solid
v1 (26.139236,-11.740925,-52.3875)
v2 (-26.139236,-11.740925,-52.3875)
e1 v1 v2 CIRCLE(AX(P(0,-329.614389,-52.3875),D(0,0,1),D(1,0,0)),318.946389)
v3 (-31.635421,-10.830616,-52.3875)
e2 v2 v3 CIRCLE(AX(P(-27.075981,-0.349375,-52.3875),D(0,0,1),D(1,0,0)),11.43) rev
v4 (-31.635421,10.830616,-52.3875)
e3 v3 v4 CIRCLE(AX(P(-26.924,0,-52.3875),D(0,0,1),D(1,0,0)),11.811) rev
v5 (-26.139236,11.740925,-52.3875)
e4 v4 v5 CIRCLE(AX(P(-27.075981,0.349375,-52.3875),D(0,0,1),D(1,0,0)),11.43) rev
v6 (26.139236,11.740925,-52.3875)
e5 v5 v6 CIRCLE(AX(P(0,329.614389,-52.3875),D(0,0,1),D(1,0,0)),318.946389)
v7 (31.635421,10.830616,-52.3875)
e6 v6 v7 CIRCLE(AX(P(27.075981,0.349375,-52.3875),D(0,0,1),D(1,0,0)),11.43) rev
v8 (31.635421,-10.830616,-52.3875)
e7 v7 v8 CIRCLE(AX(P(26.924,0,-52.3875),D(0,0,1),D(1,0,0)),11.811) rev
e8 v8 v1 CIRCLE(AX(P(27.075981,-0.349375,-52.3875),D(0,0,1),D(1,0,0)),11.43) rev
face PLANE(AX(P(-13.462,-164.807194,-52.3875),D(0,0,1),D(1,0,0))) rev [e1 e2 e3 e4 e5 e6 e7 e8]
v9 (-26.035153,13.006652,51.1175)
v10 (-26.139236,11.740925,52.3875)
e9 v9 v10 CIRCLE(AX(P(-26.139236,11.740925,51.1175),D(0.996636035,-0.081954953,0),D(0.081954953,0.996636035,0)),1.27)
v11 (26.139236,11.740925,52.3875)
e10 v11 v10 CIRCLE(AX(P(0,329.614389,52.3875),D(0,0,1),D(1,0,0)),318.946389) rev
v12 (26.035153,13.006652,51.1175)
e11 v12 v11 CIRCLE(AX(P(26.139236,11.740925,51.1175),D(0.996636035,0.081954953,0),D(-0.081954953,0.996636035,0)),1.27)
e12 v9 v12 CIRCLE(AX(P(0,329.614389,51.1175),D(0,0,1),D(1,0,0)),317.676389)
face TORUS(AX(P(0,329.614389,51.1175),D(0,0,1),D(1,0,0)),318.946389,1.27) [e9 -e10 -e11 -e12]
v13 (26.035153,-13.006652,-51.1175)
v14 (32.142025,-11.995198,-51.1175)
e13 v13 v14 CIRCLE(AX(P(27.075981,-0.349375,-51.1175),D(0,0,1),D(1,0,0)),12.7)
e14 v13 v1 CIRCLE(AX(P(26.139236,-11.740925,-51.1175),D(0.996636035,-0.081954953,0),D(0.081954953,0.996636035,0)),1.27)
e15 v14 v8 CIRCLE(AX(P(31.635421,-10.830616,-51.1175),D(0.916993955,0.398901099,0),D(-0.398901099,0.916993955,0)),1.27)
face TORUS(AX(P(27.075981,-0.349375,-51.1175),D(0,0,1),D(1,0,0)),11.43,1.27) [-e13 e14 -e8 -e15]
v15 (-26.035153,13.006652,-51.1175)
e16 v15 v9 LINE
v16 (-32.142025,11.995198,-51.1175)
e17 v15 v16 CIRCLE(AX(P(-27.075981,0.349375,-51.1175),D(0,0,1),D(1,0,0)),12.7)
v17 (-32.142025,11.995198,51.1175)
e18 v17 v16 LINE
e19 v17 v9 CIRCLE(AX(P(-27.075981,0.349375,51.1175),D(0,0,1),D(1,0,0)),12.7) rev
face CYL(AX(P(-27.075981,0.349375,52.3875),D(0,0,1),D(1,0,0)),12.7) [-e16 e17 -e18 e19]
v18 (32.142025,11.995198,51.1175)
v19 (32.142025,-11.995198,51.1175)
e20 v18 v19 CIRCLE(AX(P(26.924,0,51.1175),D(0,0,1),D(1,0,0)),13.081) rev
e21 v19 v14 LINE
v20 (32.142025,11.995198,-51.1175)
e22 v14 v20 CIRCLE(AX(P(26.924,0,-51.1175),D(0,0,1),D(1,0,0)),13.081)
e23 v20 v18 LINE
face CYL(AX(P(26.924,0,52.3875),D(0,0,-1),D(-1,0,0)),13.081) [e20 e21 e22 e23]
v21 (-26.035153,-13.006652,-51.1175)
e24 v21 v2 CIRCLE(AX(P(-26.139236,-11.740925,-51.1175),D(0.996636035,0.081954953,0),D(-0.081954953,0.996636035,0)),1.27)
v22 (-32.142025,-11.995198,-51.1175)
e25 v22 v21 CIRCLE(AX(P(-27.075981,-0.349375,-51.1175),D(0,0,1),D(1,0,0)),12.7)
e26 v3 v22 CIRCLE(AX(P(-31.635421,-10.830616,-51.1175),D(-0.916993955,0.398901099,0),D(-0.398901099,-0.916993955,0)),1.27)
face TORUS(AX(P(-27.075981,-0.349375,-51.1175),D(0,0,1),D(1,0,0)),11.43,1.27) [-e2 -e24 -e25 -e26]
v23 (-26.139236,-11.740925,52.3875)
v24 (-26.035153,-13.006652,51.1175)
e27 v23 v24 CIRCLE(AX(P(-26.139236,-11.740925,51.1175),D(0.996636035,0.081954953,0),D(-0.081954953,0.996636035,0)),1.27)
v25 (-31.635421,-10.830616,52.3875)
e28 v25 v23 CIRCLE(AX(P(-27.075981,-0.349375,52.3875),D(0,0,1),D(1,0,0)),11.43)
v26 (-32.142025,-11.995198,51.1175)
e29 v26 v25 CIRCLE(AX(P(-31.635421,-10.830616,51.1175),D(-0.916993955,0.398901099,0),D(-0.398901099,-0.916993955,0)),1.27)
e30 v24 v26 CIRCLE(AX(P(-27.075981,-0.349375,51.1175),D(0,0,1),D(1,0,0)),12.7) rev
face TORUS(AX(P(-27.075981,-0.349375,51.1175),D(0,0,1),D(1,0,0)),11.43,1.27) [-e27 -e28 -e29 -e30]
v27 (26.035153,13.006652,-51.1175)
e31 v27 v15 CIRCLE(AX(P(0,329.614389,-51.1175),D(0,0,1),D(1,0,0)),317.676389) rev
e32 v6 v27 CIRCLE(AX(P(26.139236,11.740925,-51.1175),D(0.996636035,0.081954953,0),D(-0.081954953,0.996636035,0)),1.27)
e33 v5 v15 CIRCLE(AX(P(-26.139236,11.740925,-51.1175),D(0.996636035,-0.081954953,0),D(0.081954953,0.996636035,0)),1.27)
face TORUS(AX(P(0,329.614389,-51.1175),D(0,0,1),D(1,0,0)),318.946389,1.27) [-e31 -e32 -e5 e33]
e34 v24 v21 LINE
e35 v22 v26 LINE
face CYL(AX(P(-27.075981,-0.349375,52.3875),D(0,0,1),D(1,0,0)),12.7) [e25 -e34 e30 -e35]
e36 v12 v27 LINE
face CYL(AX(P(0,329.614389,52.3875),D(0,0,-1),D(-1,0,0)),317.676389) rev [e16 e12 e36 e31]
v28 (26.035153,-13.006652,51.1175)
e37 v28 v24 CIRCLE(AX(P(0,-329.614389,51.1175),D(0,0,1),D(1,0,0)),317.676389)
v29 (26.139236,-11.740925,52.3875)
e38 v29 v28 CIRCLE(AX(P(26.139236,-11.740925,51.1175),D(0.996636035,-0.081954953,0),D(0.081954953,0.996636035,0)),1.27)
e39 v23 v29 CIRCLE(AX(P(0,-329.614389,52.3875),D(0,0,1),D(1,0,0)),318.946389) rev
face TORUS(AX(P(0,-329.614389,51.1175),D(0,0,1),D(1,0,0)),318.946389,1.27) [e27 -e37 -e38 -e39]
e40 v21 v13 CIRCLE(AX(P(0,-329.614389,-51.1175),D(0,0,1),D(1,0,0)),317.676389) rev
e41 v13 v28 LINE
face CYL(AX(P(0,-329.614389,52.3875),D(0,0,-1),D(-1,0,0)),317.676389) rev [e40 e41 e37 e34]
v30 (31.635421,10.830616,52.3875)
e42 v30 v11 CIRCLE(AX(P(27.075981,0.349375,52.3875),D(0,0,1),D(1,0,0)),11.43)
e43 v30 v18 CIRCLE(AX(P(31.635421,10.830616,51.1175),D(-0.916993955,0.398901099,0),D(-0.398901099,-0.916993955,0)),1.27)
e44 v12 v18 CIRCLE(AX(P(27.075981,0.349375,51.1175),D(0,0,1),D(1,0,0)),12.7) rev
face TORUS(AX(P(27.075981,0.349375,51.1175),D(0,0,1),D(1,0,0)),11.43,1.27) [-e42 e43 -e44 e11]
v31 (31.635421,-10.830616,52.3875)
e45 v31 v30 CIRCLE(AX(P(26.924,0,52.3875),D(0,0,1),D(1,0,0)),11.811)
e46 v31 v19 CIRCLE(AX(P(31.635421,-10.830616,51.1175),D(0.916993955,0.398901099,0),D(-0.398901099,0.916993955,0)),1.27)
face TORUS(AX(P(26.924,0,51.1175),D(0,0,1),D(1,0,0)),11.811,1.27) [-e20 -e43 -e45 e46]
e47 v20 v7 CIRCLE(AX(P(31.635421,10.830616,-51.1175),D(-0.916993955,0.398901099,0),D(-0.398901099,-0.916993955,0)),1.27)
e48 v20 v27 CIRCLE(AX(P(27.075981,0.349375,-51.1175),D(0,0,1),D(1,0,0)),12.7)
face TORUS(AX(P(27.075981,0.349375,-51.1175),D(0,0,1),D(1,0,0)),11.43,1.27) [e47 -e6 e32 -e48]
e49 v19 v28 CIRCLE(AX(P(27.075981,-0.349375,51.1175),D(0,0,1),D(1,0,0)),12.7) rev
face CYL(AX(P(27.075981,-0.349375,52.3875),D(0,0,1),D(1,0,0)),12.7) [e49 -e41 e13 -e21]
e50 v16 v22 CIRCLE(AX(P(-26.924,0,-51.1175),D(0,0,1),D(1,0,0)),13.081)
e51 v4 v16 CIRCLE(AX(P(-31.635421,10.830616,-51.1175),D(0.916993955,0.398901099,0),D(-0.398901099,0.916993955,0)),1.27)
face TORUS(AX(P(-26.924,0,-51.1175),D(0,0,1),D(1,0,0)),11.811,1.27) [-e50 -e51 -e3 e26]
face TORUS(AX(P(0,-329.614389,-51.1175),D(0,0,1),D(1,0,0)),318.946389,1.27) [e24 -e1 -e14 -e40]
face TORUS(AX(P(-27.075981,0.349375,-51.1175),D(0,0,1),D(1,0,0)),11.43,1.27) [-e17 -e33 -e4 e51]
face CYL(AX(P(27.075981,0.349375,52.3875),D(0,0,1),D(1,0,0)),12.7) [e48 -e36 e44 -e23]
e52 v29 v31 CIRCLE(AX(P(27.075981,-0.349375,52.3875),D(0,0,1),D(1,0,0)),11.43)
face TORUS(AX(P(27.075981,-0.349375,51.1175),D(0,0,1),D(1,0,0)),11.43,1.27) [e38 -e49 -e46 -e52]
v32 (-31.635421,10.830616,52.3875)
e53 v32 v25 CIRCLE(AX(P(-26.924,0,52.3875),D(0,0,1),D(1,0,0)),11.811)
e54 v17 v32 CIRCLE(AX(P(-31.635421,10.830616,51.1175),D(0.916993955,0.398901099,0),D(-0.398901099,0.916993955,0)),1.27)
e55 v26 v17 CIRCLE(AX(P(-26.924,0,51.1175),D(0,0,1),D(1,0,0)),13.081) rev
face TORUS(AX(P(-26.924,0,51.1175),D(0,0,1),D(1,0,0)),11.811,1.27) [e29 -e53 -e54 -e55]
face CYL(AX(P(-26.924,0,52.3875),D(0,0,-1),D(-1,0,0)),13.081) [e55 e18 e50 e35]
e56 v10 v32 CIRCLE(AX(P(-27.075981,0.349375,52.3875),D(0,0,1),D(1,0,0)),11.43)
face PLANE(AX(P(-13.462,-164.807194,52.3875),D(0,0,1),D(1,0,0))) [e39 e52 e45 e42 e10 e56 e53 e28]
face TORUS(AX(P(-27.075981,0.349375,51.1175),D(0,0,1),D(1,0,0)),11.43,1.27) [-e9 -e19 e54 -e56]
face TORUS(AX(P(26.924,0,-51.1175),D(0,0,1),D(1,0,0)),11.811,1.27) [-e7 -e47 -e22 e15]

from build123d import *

# Parameters (mm, degrees)
BOSS_EXTRUDE1_DEPTH = 52.3875
FILLET1_R           = 12.7
FILLET2_R           = 1.27


with BuildPart() as part:
    # Sketch1 → Boss-Extrude1 (new, symmetric)
    with BuildSketch(Plane.XY):
        with BuildLine():
            ThreePointArc((-26.924, -13.081), (0, -11.938), (26.924, -13.081))
            ThreePointArc((26.924, -13.081), (40.005, 0), (26.924, 13.081))
            ThreePointArc((26.924, 13.081), (0, 11.938), (-26.924, 13.081))
            ThreePointArc((-26.924, 13.081), (-40.005, 0), (-26.924, -13.081))
        make_face()
    extrude(amount=BOSS_EXTRUDE1_DEPTH, both=True)

    # Fillet1
    # the kernel refuses this fillet: 12.7 mm, written as the material it takes off along each edge
    with BuildSketch(Plane(origin=(-26.924, 13.081, 65.711996683), x_dir=(-0.9790285886887711, -0.2037229062478567, 0), z_dir=(0, 0, -1)), Plane(origin=(-26.924, -13.081, -65.711996683), x_dir=(-0.9790285886887613, 0.20372290624790387, 0), z_dir=(0, 0, 1))) as fillet1_piece_1:
        with BuildLine():
            CenterArc((2.742517764, -12.433663076), FILLET1_R, 78.245250593, 28.210444168)
            ThreePointArc((-0.855059891, -0.253866895), (-0.427440847, -0.127233545), (0, 0))
            ThreePointArc((0, 0), (2.664899337, 0.274327031), (5.329798673, 0))
        make_face()
    extrude(amount=131.423993366, mode=Mode.SUBTRACT)
    with BuildSketch(Plane(origin=(26.924, 13.081, 65.711996683), x_dir=(-0.9965199988038926, -0.08335401600336978, 0), z_dir=(0, 0, -1))) as fillet1_piece_2:
        with BuildLine():
            CenterArc((0.909779676, -12.699987485), FILLET1_R, 90.08043566, 28.210444168)
            ThreePointArc((-5.109360575, -1.516966845), (-2.632759224, -0.495502435), (0, 0))
            ThreePointArc((0, 0), (0.445975285, -0.000313045), (0.891950569, 0))
        make_face()
    extrude(amount=131.423993366, mode=Mode.SUBTRACT)
    with BuildSketch(Plane(origin=(26.924, -13.081, -65.711996683), x_dir=(0.979028588688819, 0.20372290624762615, 0), z_dir=(0, 0, 1))) as fillet1_piece_3:
        with BuildLine():
            CenterArc((2.742517764, 12.433663076), FILLET1_R, 253.544305239, 28.210444168)
            ThreePointArc((-0.855059891, 0.253866895), (-0.427440847, 0.127233545), (0, 0))
            ThreePointArc((0, 0), (2.664899337, -0.274327031), (5.329798673, 0))
        make_face()
    extrude(amount=131.423993366, mode=Mode.SUBTRACT)

    # Fillet2
    fillet2_edges = [part.edges().sort_by_distance(p)[0] for p in [
        (40.005, 0, -52.3875),
        (40.005, 0, 52.3875),
        (-40.005, 0, -52.3875),
        (0, 11.938, -52.3875),
        (0, -11.938, -52.3875),
        (29.15115627, 12.878686287, -52.3875),
        (-29.15115627, 12.878686287, -52.3875),
        (-29.15115627, -12.878686287, -52.3875),
        (29.15115627, -12.878686287, -52.3875),
        (0, -11.938, 52.3875),
        (-40.005, 0, 52.3875),
        (0, 11.938, 52.3875),
        (29.15115627, 12.878686287, 52.3875),
        (-29.15115627, 12.878686287, 52.3875),
        (-29.15115627, -12.878686287, 52.3875),
        (29.15115627, -12.878686287, 52.3875),
    ]]
    fillet(fillet2_edges, radius=FILLET2_R)


solid = part.part
